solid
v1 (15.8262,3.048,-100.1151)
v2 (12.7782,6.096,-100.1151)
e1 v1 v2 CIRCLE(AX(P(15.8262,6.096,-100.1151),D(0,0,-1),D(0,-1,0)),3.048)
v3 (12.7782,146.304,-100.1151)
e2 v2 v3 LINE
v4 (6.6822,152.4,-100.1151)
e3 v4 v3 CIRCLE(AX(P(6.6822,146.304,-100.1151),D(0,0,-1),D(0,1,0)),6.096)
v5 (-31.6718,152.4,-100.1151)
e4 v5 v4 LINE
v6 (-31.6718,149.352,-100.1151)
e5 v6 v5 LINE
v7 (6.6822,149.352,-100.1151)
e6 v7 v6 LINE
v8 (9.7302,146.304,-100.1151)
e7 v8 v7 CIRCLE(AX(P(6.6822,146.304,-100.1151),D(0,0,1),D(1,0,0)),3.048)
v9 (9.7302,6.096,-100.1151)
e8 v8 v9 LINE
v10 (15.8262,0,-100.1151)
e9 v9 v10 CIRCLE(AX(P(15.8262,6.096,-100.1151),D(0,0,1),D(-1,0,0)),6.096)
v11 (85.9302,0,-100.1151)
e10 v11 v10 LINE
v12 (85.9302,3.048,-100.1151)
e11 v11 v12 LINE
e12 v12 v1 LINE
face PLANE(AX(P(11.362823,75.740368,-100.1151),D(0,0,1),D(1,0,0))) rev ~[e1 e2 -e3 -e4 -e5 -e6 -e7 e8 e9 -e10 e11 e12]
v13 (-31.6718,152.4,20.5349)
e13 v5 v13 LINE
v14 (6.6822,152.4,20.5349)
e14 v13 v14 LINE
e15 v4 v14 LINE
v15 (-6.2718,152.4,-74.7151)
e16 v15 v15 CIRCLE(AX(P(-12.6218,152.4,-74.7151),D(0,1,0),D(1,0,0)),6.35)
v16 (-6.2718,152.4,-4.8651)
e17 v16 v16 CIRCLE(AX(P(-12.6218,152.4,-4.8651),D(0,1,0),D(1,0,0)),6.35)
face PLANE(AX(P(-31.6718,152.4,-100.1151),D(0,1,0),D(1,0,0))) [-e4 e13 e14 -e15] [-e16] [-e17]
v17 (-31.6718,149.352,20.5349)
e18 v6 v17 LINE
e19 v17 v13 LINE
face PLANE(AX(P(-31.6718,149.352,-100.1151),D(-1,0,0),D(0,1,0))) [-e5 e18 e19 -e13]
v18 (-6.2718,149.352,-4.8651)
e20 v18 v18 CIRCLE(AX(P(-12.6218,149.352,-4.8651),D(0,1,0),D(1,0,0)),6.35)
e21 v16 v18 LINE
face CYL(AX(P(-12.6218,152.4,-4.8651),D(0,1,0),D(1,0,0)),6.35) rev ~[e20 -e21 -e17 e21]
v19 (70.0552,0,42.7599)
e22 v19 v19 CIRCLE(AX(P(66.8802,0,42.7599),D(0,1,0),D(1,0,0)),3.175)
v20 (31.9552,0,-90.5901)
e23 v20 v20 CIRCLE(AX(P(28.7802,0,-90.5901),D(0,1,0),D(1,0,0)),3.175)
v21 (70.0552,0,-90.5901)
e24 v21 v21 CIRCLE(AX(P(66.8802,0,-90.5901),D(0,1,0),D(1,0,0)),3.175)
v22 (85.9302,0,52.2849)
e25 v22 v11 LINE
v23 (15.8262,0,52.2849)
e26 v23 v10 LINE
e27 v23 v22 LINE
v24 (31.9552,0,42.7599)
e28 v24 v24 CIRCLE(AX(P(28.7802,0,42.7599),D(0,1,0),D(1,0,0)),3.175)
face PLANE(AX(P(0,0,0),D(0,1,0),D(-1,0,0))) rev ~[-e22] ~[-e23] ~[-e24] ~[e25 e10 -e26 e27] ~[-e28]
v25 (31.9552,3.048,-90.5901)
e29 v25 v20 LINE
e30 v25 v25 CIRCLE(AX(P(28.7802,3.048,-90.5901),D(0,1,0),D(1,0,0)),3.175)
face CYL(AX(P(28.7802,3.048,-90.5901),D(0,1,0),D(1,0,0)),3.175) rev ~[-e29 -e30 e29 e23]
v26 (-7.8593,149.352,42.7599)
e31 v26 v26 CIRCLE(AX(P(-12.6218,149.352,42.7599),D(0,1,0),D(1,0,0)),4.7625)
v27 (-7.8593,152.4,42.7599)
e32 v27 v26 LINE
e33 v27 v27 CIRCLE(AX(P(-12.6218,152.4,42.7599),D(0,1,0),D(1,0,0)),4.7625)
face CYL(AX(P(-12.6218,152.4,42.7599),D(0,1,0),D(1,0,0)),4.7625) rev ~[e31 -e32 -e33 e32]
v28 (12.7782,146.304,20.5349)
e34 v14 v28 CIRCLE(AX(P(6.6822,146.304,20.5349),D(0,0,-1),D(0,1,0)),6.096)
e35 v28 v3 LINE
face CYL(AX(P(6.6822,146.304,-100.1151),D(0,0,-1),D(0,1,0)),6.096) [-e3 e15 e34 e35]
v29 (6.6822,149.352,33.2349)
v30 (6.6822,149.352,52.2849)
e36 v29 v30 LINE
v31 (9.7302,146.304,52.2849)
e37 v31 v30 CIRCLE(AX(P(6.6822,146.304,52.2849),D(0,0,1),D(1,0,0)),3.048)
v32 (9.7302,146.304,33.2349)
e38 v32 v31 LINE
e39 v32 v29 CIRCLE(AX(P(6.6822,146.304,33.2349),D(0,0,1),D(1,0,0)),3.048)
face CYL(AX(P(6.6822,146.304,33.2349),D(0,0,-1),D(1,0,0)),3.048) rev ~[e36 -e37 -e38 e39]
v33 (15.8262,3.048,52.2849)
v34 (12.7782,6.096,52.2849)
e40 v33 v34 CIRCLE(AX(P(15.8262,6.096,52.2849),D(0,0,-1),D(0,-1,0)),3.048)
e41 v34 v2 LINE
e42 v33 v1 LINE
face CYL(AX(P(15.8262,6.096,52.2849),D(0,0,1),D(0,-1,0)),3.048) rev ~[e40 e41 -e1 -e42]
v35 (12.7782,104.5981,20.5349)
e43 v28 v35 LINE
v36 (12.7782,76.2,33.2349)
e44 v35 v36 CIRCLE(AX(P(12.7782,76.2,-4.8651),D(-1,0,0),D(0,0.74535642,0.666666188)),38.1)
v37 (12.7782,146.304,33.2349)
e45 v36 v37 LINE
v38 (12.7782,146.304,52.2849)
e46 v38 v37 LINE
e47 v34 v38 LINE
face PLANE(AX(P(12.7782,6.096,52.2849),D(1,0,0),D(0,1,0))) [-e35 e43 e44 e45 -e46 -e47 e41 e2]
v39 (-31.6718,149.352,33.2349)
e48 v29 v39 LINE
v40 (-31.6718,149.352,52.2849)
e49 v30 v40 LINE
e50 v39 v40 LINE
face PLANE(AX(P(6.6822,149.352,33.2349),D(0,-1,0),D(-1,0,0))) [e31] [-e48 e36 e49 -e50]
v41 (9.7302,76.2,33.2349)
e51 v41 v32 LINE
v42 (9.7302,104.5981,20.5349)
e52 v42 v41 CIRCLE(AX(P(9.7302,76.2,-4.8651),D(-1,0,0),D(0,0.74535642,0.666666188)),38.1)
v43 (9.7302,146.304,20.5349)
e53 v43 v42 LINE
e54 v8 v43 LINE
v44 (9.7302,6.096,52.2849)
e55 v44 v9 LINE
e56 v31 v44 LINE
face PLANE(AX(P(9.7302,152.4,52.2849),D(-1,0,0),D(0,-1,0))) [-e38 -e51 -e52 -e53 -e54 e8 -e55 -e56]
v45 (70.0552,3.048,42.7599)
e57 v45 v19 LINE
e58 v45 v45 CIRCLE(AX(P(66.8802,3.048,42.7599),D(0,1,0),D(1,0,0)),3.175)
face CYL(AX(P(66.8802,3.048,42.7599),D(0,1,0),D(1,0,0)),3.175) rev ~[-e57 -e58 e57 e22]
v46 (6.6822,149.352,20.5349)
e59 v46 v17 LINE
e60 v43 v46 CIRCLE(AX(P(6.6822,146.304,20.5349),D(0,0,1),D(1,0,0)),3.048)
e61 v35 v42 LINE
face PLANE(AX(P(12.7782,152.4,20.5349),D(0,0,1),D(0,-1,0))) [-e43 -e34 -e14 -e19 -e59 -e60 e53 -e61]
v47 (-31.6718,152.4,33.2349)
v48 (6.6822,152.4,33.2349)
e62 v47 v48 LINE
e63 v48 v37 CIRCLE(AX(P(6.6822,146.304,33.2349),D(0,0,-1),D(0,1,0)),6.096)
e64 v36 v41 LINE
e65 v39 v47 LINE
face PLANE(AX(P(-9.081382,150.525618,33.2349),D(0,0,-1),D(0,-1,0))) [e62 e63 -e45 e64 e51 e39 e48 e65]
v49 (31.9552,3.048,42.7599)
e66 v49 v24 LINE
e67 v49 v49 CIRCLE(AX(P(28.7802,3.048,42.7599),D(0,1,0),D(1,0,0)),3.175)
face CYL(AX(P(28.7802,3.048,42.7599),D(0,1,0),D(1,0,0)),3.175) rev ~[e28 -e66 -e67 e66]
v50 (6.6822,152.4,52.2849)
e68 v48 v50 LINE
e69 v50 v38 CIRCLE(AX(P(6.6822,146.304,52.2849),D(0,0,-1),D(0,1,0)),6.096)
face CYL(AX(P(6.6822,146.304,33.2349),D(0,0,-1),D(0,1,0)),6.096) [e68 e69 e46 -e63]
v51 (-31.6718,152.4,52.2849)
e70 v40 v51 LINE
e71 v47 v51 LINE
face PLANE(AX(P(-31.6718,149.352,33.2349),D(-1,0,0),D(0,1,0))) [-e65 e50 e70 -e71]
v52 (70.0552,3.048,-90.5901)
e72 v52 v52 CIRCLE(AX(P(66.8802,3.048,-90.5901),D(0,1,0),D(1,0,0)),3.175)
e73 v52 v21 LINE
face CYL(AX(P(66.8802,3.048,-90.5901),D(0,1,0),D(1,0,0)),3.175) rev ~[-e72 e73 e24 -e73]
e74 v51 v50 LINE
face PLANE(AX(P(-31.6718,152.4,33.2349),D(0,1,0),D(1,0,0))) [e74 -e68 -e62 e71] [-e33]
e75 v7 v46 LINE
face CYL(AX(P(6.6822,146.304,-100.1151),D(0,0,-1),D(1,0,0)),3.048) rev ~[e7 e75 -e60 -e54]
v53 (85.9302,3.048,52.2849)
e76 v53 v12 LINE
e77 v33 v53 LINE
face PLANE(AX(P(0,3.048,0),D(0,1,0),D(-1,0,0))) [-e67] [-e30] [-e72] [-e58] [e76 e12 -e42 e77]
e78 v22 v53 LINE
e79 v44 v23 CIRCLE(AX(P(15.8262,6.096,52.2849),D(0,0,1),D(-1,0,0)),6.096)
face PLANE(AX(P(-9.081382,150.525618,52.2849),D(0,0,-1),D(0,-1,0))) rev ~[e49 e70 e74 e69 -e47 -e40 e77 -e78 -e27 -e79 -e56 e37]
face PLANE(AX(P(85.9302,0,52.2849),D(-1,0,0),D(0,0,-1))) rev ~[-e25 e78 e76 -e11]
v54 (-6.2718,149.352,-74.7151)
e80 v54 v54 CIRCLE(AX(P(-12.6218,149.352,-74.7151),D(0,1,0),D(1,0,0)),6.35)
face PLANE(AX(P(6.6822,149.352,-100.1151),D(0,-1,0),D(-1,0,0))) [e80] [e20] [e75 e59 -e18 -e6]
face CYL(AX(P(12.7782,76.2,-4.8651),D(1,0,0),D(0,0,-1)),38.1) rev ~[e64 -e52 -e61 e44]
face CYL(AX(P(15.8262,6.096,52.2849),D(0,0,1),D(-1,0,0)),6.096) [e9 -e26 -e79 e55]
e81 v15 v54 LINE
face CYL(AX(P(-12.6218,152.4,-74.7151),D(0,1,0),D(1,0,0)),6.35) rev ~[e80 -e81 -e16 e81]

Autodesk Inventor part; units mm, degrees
ref_plane "YZ Plane" through (0, 0, 0) normal (1, 0, 0) x (0, 1, 0)
ref_plane "XZ Plane" through (0, 0, 0) normal (0, 1, 0) x (-1, 0, 0)
ref_plane "XY Plane" through (0, 0, 0) normal (0, 0, 1) x (1, 0, 0)
sketch "Sketch1" plane through (0, 0, 0) normal (0, 1, 0) x (-1, 0, 0)
  line L0 (-9.7302, 52.2849) -> (-85.9302, 52.2849)
  line L1 (-85.9302, 52.2849) -> (-85.9302, -100.1151)
  line L2 (-85.9302, -100.1151) -> (-9.7302, -100.1151)
  line L3 (-9.7302, -100.1151) -> (-9.7302, 52.2849)
  point P0 (0, 0)
  dimension "d0" = 152.4
  dimension "d1" = 76.2
extrude "Plate1" add sketch "Sketch1" along normal blind 3.048
sketch "Sketch2" plane through (12.7782, 0, 52.2849) normal (-1, 0, 0) x (0, -1, 0)
  line L0 (0, -152.4) -> (0, 0)
  line L1 (0, 0) -> (-152.4, 0)
  line L2 (-152.4, 0) -> (-152.4, -152.4)
  line L3 (-152.4, -152.4) -> (0, -152.4)
edge flange "Flange1" height 152.4 angle 90 thickness 3.048 bend radius 3.048 thickness toward (-1, 0, 0) relief tear relief width 3.048 relief depth 1.524 edges at (9.7302, 3.048, -23.9151) wall of the first edge with corners at (12.7782, 0, -100.1151) (12.7782, 0, 52.2849) (12.7782, 152.4, 52.2849) (12.7782, 152.4, -100.1151)
bend "Bend1"
corner "Corner1"
sketch "Sketch5" plane through (12.7782, 152.4, 52.2849) normal (1, 0, 0) x (0, 0, -1)
  circle A0 centre (57.15, -76.2) radius 38.1
  line L0 (0, -152.4) -> (152.4, -152.4) projected
  line L1 (152.4, 0) -> (152.4, -146.304) projected
  point P0 (52.2849, -152.4)
  dimension "d23" = 76.2
  dimension "d24" = 76.2
  dimension "d25" = 95.25
extrude "Cut1" cut sketch "Sketch5" against normal blind 3.048
sketch "Sketch6" plane through (12.7782, 152.4, 52.2849) normal (1, 0, 0) x (0, 0, -1)
  circle A0 centre (57.15, -76.2) radius 38.1 projected
  line L0 (19.05, -76.2) -> (19.05, 0)
  line L1 (152.4, 0) -> (0, 0) projected
  line L2 (19.05, 0) -> (31.75, 0)
  line L3 (31.75, 0) -> (31.75, -47.8019)
  arc A1 (31.75, -47.8019) -> (19.05, -76.2) centre (57.15, -76.2) ccw
  point P0 (52.2849, -152.4)
  dimension "d47" = 12.7
extrude "Cut2" cut sketch "Sketch6" against normal blind 3.048 contours A0 L0 L1 L3
sketch "Sketch7" plane through (12.7782, 149.352, 33.2349) normal (0, 1, 0) x (-1, 0, 0)
  line L0 (0, 19.05) -> (0, 0)
  line L1 (0, 0) -> (44.45, 0)
  line L2 (44.45, 0) -> (44.45, 19.05)
  line L3 (44.45, 19.05) -> (0, 19.05)
edge flange "Flange3" height 44.45 angle 90 thickness 3.048 bend radius 3.048 thickness toward (0, 1, 0) relief tear relief width 3.048 relief depth 1.524 corner gap 3.048 corner form 0 edges at (9.7302, 152.4, 42.7599) (9.7302, 152.4, -39.7901) wall of the first edge with corners at (12.7782, 149.352, 52.2849) (12.7782, 149.352, 33.2349) (-31.6718, 149.352, 33.2349) (-31.6718, 149.352, 52.2849)
bend "Bend3"
corner "Corner3"
sketch "Sketch8" plane through (-31.6718, 152.4, 20.5349) normal (0, 1, 0) x (1, 0, 0)
  circle A0 centre (19.05, 95.25) radius 6.35
  circle A1 centre (19.05, 25.4) radius 6.35
  line L0 (38.354, 0) -> (0, 0) projected
  line L1 (0, 0) -> (0, 120.65) projected
  point P0 (31.6718, 20.5349)
  dimension "d40" = 12.7
  dimension "d41" = 69.85
  dimension "d42" = 25.4
  dimension "d43" = 19.05
  dimension "d44" = 19.05
extrude "Cut3" cut sketch "Sketch8" against normal blind 3.048
sketch "Sketch9" plane through (-31.6718, 152.4, 52.2849) normal (0, 1, 0) x (1, 0, 0)
  circle A0 centre (19.05, 9.525) radius 4.7625
  line L0 (38.354, 0) -> (0, 0) projected
  line L1 (0, 0) -> (0, 19.05) projected
  point P0 (31.6718, 52.2849)
  dimension "d48" = 9.525
  dimension "d49" = 9.525
  dimension "d50" = 19.05
extrude "Cut4" cut sketch "Sketch9" against normal blind 3.048
sketch "Sketch10" plane through (-31.6718, 149.352, 20.5349) normal (0, 0, 1) x (1, 0, 0)
  point P0 (31.6718, -149.352)
sketch "Sketch11" plane through (0, 3.048, 0) normal (0, 1, 0) x (1, 0, 0)
  circle A0 centre (66.8802, -42.7599) radius 3.175
  circle A1 centre (28.7802, -42.7599) radius 3.175
  line L0 (85.9302, -52.2849) -> (15.8262, -52.2849) projected
  line L1 (85.9302, 100.1151) -> (85.9302, -52.2849) projected
  circle A2 centre (66.8802, 90.5901) radius 3.175
  circle A3 centre (28.7802, 90.5901) radius 3.175
  line L2 (15.8262, 100.1151) -> (85.9302, 100.1151) projected
  point P0 (0, 0)
  dimension "d53" = 6.35
  dimension "d54" = 6.35
  dimension "d55" = 9.525
  dimension "d56" = 9.525
  dimension "d57" = 38.1
  dimension "d58" = 19.05
  dimension "d59" = 6.35
  dimension "d60" = 6.35
  dimension "d63" = 38.1
  dimension "d65" = 9.525
  dimension "d66" = 9.525
  dimension "d67" = 19.05
extrude "Cut5" cut sketch "Sketch11" against normal blind 3.048
equation "\"d26\" = Thickness"
equation "\"d28\" = Thickness"
equation "\"d45\" = Thickness"
equation "\"d51\" = Thickness"
equation "\"d68\" = Thickness"
equation "\"d3\" = BendReliefWidth"
equation "\"d4\" = BendReliefDepth"
equation "\"d5\" = MinimumRemnant"
equation "\"d6\" = BendRadius"
equation "\"d9\" = BendRadius"
equation "\"d10\" = CornerReliefSize"
equation "\"d11\" = GapSize"
equation "\"d12\" = JacobiRadiusSize"
equation "\"d30\" = BendReliefWidth"
equation "\"d31\" = BendReliefDepth"
equation "\"d32\" = MinimumRemnant"
equation "\"d33\" = BendRadius"
equation "\"d36\" = BendRadius"
equation "\"d37\" = CornerReliefSize"
equation "\"d38\" = GapSize"
equation "\"d39\" = JacobiRadiusSize"
equation "\"BendRadius\" = Thickness"
equation "\"BendReliefWidth\" = Thickness"
equation "\"BendReliefDepth\" = 0.5 * Thickness"
equation "\"CornerReliefSize\" = 4 * Thickness"
equation "\"MinimumRemnant\" = 2 * Thickness"
equation "\"TransitionRadius\" = BendRadius"
equation "\"JacobiRadiusSize\" = BendRadius"
equation "\"GapSize\" = Thickness"
equation "\"d2\" = BendRadius"
equation "\"Thickness\" = 3.048"
properties part number "Tape Measure Dispenser Part 2"
